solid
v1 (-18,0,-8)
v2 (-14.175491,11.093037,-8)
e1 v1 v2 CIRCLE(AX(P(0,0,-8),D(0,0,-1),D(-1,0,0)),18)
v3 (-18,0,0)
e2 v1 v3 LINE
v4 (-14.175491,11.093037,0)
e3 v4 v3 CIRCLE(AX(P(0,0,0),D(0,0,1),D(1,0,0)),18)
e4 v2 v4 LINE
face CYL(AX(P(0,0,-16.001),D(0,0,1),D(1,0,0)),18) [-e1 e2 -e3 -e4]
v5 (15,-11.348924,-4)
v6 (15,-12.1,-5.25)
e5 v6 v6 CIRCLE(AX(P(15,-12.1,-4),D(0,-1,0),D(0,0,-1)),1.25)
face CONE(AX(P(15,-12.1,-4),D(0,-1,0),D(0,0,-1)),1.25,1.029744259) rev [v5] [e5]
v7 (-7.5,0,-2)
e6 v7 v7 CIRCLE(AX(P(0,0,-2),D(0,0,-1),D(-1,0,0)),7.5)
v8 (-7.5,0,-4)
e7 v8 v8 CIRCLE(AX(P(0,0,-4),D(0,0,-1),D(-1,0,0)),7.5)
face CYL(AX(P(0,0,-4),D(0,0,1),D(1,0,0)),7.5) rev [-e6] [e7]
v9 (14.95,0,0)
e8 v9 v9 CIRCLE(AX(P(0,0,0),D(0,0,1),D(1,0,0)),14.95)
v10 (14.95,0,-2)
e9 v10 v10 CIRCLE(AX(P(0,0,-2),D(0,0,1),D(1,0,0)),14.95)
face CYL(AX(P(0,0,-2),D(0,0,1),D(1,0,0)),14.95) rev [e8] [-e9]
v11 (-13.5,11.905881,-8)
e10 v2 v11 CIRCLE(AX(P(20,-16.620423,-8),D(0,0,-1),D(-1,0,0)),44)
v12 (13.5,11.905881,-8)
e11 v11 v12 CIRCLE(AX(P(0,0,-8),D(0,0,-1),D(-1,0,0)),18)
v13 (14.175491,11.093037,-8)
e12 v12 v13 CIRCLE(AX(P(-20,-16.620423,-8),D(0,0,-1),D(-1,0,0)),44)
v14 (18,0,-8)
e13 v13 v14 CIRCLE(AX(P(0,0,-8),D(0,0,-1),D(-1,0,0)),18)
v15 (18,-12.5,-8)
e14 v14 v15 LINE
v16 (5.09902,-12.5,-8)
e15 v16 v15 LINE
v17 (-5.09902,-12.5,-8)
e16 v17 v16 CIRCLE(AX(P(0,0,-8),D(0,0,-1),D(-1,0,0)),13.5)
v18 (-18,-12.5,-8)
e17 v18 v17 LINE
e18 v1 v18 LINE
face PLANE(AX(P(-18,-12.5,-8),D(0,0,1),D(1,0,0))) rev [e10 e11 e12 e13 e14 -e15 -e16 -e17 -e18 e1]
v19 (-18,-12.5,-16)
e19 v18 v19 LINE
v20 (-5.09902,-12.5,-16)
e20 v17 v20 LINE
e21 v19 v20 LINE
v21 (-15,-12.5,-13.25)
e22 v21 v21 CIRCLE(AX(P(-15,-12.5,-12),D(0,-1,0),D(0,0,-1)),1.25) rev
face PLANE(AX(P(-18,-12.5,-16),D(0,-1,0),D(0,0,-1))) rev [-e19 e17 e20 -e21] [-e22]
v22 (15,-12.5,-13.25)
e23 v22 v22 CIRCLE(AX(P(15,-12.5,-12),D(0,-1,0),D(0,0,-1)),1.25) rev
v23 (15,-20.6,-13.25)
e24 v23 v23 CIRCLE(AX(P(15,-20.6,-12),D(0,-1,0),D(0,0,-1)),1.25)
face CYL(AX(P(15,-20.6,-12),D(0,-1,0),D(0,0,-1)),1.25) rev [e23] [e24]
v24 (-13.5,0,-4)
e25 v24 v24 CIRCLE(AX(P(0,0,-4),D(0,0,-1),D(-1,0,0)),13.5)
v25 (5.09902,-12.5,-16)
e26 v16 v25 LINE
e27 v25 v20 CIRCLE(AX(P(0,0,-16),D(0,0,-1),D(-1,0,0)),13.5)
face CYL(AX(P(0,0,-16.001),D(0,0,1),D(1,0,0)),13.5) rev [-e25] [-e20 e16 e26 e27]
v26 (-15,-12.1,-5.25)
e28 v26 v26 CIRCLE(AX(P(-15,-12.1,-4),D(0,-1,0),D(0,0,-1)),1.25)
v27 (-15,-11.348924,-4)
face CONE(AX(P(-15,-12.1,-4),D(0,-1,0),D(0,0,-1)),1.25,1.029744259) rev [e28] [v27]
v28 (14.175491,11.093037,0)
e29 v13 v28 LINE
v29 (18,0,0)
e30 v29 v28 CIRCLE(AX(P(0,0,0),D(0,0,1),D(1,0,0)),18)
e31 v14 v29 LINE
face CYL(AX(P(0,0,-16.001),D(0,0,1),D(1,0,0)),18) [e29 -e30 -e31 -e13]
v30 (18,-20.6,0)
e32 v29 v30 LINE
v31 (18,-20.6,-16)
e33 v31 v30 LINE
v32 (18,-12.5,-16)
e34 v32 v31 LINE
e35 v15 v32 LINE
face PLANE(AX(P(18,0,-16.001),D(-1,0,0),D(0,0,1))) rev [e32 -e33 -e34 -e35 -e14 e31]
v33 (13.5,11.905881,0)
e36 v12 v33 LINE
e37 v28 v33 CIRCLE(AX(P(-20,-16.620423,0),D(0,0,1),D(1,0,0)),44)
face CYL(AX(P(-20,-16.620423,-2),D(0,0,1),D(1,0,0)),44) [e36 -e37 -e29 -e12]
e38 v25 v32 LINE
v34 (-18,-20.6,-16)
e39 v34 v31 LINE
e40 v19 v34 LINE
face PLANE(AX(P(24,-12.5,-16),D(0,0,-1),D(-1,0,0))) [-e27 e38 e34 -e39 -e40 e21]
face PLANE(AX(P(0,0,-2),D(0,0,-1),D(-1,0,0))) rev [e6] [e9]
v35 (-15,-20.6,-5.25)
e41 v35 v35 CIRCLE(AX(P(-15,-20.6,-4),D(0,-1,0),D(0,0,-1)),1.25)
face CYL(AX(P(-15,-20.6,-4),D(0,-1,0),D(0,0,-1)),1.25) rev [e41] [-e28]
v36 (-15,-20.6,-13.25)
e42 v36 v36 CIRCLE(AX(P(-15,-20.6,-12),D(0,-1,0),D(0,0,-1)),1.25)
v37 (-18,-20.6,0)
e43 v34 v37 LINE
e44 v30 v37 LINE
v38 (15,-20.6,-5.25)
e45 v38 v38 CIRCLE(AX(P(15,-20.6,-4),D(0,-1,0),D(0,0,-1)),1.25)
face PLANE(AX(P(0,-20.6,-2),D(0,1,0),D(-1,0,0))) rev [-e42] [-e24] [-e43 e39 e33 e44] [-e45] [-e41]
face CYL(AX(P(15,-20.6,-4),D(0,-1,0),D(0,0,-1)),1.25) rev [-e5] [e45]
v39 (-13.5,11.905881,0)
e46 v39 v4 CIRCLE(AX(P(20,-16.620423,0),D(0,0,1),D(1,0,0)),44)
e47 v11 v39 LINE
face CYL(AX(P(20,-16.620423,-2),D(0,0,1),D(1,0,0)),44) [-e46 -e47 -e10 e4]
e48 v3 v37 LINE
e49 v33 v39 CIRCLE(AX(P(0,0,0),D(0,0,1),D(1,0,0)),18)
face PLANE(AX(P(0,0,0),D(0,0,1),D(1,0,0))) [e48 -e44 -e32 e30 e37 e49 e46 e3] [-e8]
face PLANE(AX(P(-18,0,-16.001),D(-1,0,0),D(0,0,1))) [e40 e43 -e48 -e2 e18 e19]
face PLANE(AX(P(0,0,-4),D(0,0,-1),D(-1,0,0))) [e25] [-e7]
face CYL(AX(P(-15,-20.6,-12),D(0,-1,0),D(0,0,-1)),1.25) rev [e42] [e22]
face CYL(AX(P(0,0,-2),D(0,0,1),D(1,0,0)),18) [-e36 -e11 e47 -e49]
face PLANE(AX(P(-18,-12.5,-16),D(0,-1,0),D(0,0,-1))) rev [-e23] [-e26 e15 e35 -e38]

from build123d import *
from build123d.topology import SkipClean

# Parameters (mm, degrees)
ESBO_O1_R                     = 18
ESBO_O1_R_2                   = 14.95
RESSALTO_EXTRUS_O1_DEPTH      = 2
ESBO_O16_R                    = 7.5
RESSALTO_EXTRUS_O5_DEPTH      = 2
ESBO_O17_W                    = 48
ESBO_O17_H                    = 12
RESSALTO_EXTRUS_O6_DEPTH      = 8.1
CHANFRO1_SIZE                 = 12
CHANFRO1_SIZE_2               = 12.5
FILETE3_R                     = 44
CORTE_EXTRUS_O11_REACH        = 37.445
CORTE_EXTRUS_O12_REACH        = 31.872
FURO_ROSCADO_DE_M3X0_51_D     = 2.5
FURO_ROSCADO_DE_M3X0_51_DEPTH = 8.5
FURO_ROSCADO_DE_M3X0_51_TIP   = 0.751075774
CORTE_EXTRUS_O13_DEPTH        = 32.691639276
CORTE_EXTRUS_O13_DEPTH_BACK   = 32.691639276
RESSALTO_EXTRUS_O7_DEPTH      = 12
CORTE_EXTRUS_O15_START        = -12
ESBO_O26_R                    = 13.5
CORTE_EXTRUS_O15_DEPTH        = 12
RESSALTO_EXTRUS_O8_START      = -4
RESSALTO_EXTRUS_O8_DEPTH      = 4
RESSALTO_EXTRUS_O9_START      = -4
RESSALTO_EXTRUS_O9_DEPTH      = 4


with BuildPart() as part:
    # Esboço1 → Ressalto-extrusão1 (new body)
    # profile 1 of 2: a face of its own
    with BuildSketch(Plane.XY):
        Circle(ESBO_O1_R)
        Circle(ESBO_O1_R_2, mode=Mode.SUBTRACT)
    # profile 2 of 2: a face of its own
    with BuildSketch(Plane.XY):
        with BuildLine():
            Line((24, -20.6), (24, 0))
            Line((24, 0), (13.5, 11.9058809))
            ThreePointArc((13.5, 11.9058809), (16.83745824, 6.363961031), (18, 0))
            ThreePointArc((18, 0), (-6.363961031, -16.83745824), (-13.5, 11.9058809))
            Line((-13.5, 11.9058809), (-24, 0))
            Line((-24, 0), (-24, -20.6))
            Line((-24, -20.6), (-18, -20.6))
            Line((-18, -20.6), (18, -20.6))
            Line((18, -20.6), (24, -20.6))
        make_face()
    extrude(amount=-RESSALTO_EXTRUS_O1_DEPTH)

    # Esboço16 → Ressalto-extrusão5 (add)
    with BuildSketch(Plane(origin=(0, 0, -2), x_dir=(-1, 0, 0), z_dir=(0, 0, -1))):
        with BuildLine():
            Line((-13.5, 11.9058809), (-24, 0))
            Line((-24, 0), (-24, -20.6))
            Line((-24, -20.6), (24, -20.6))
            Line((24, -20.6), (24, 0))
            Line((24, 0), (13.5, 11.9058809))
            ThreePointArc((13.5, 11.9058809), (0, 18), (-13.5, 11.9058809))
        make_face()
        Circle(ESBO_O16_R, mode=Mode.SUBTRACT)
    extrude(amount=RESSALTO_EXTRUS_O5_DEPTH)

    # Esboço17 → Ressalto-extrusão6 (add)
    with BuildSketch(Plane.XZ.offset(20.6)):
        with Locations((0, -10)):
            Rectangle(ESBO_O17_W, ESBO_O17_H)
    extrude(amount=-RESSALTO_EXTRUS_O6_DEPTH)

    # Chanfro1
    # the kernel refuses this chamfer: 12.5, 12 mm, written as the material it adds along each edge
    with BuildSketch(Plane(origin=(-24, -12.5, -4), x_dir=(0, 0, -1), z_dir=(1, 0, 0))) as chanfro1_piece_1_section:
        Polygon((CHANFRO1_SIZE, 0), (0, CHANFRO1_SIZE_2), (0, 0), align=None)
    chanfro1_piece_1 = extrude(amount=48, mode=Mode.PRIVATE)
    chanfro1_piece_1 = split(chanfro1_piece_1, bisect_by=Plane(origin=(-24, -12.5, -16), z_dir=(0, 0, 1)), keep=Keep.TOP, mode=Mode.PRIVATE)
    chanfro1_piece_1 = split(chanfro1_piece_1, bisect_by=Plane(origin=(9.200979635, 16.7805118, -4), z_dir=(-0.7499999999999999, -0.6614378277661479, 0)), keep=Keep.TOP, mode=Mode.PRIVATE)
    chanfro1_piece_1 = chanfro1_piece_1 - Plane(origin=(0, 0, -4), x_dir=(-1, 0, 0), z_dir=(0, 0, 1)) * Cylinder(7.5, 146, mode=Mode.PRIVATE)
    add(chanfro1_piece_1)

    # Filete3
    # the kernel refuses this fillet: 44 mm, written as the material it takes off along each edge
    with BuildSketch(Plane(origin=(-24, 0, -45.551056879), x_dir=(0, -1, 0), z_dir=(0, 0, 1))) as filete3_piece_1:
        with BuildLine():
            CenterArc((16.620422751, 44), FILETE3_R, 229.584560979, 40.415439021)
            Line((-11.9058809, 10.5), (0, 0))
            Line((0, 0), (16.620422751, 0))
        make_face()
    extrude(amount=87.102113757, mode=Mode.SUBTRACT)
    with BuildSketch(Plane(origin=(24, 0, 41.551056879), x_dir=(-0.6614378277661485, 0.7499999999999993, -1.154178375495321e-15), z_dir=(0, 0, -1))) as filete3_piece_2:
        with BuildLine():
            CenterArc((16.637947358, -43.993376321), FILETE3_R, 90.994183088, 40.415439021)
            Line((-12.465317064, -10.993376321), (0, 0))
            Line((0, 0), (15.874507866, 0))
        make_face()
    extrude(amount=87.102113757, mode=Mode.SUBTRACT)

    # Esboço18 → Corte-extrusão11 (cut, up to next)
    with BuildSketch(Plane.XY, mode=Mode.PRIVATE) as corte_extrus_o11_sk1:
        with BuildLine():
            Line((18, 0), (18, -20.6))
            Line((18, -20.6), (24, -20.6))
            Line((24, -20.6), (24, -16.620422751))
            ThreePointArc((24, -16.620422751), (21.471204393, -1.918749165), (14.175490626, 11.093036803))
            ThreePointArc((14.175490626, 11.093036803), (17.017033103, 5.86690586), (18, 0))
        make_face()
    corte_extrus_o11_tool1 = extrude(corte_extrus_o11_sk1.sketch, amount=-CORTE_EXTRUS_O11_REACH, mode=Mode.PRIVATE) & part.part
    # Esboço18 → Corte-extrusão11 (cut, up to next)
    with BuildSketch(Plane.XY, mode=Mode.PRIVATE) as corte_extrus_o11_sk2:
        with BuildLine():
            Line((-18, -20.6), (-18, 0))
            ThreePointArc((-18, 0), (-17.017033103, 5.86690586), (-14.175490626, 11.093036803))
            ThreePointArc((-14.175490626, 11.093036803), (-21.471204393, -1.918749165), (-24, -16.620422751))
            Line((-24, -16.620422751), (-24, -20.6))
            Line((-24, -20.6), (-18, -20.6))
        make_face()
    corte_extrus_o11_tool2 = extrude(corte_extrus_o11_sk2.sketch, amount=-CORTE_EXTRUS_O11_REACH, mode=Mode.PRIVATE) & part.part
    add(corte_extrus_o11_tool1.solids().sort_by_distance((20.438878, -9.921074, 0))[0], mode=Mode.SUBTRACT)
    add(corte_extrus_o11_tool2.solids().sort_by_distance((-20.438878, -9.921074, 0))[0], mode=Mode.SUBTRACT)

    # Esboço19 → Corte-extrusão12 (cut, up to next)
    with BuildSketch(Plane(origin=(0, 0, -4), x_dir=(-1, 0, 0), z_dir=(0, 0, -1)), mode=Mode.PRIVATE) as corte_extrus_o12_sk1:
        with BuildLine():
            Line((12, -20.6), (13.462552863, -1.004823575))
            ThreePointArc((13.462552863, -1.004823575), (0, 13.5), (-13.462552863, -1.004823575))
            Line((-13.462552863, -1.004823575), (-12, -20.6))
            Line((-12, -20.6), (12, -20.6))
        make_face()
    corte_extrus_o12_tool1 = extrude(corte_extrus_o12_sk1.sketch, amount=CORTE_EXTRUS_O12_REACH, mode=Mode.PRIVATE) & part.part
    add(corte_extrus_o12_tool1.solids().sort_by_distance((0, -4.517343, -4))[0], mode=Mode.SUBTRACT)

    # Furo roscado de M3x0.51
    with Locations(Plane.XZ.offset(20.6)):
        with Locations((-15, -12), (-15, -4), (15, -4), (15, -12)):
            Hole(FURO_ROSCADO_DE_M3X0_51_D / 2, depth=FURO_ROSCADO_DE_M3X0_51_DEPTH)
            with Locations((0, 0, -(FURO_ROSCADO_DE_M3X0_51_DEPTH + FURO_ROSCADO_DE_M3X0_51_TIP / 2))):  # 118° drill point
                Cone(0, FURO_ROSCADO_DE_M3X0_51_D / 2, FURO_ROSCADO_DE_M3X0_51_TIP, mode=Mode.SUBTRACT)

    # Esboço23 → Corte-extrusão13 (cut, two sides: drawn at the far end of the back side and taken through both)
    with BuildSketch(Plane(origin=(0, 0, 0), x_dir=(0, 0, -1), z_dir=(1, 0, 0)).offset(-CORTE_EXTRUS_O13_DEPTH_BACK)):
        Polygon((16, -12.5), (8, -12.5), (8, -4.166666667), align=None)
    extrude(amount=CORTE_EXTRUS_O13_DEPTH + CORTE_EXTRUS_O13_DEPTH_BACK, mode=Mode.SUBTRACT)

    # Esboço24 → Ressalto-extrusão7 (add)
    with BuildSketch(Plane(origin=(0, 0, -4), x_dir=(-1, 0, 0), z_dir=(0, 0, -1))):
        Polygon((-12, -20.6), (12, -20.6), (12.604571142, -12.5), (-12.604571142, -12.5), align=None)
    extrude(amount=RESSALTO_EXTRUS_O7_DEPTH)

    # Esboço26 → Corte-extrusão15 (cut)
    with BuildSketch(Plane(origin=(0, 0, -16), x_dir=(-1, 0, 0), z_dir=(0, 0, -1)).offset(CORTE_EXTRUS_O15_START)):
        Circle(ESBO_O26_R)
    extrude(amount=CORTE_EXTRUS_O15_DEPTH, mode=Mode.SUBTRACT)

    # Esboço27 → Ressalto-extrusão8 (add)
    with SkipClean():  # the faces are left unmerged after this step: merging them gives an invalid solid
        with BuildSketch(Plane(origin=(0, 0, -8), x_dir=(-1, 0, 0), z_dir=(0, 0, -1)).offset(RESSALTO_EXTRUS_O8_START)):
            with BuildLine():
                Line((-12.604571142, -12.5), (-5.099019514, -12.5))
                ThreePointArc((-5.099019514, -12.5), (-10.916398789, -7.942432717), (-13.462552863, -1.004823575))
                Line((-13.462552863, -1.004823575), (-13.226557914, -4.166666667))
                Line((-13.226557914, -4.166666667), (-12.604571142, -12.5))
            make_face()
            with BuildLine():
                Line((5.099019514, -12.5), (12.604571142, -12.5))
                Line((12.604571142, -12.5), (13.462552863, -1.004823575))
                ThreePointArc((13.462552863, -1.004823575), (10.916398789, -7.942432717), (5.099019514, -12.5))
            make_face()
        extrude(amount=RESSALTO_EXTRUS_O8_DEPTH)

    # Esboço28 → Ressalto-extrusão9 (add)
    with SkipClean():  # the faces are left unmerged after this step: merging them gives an invalid solid
        with BuildSketch(Plane(origin=(0, 0, -8), x_dir=(-1, 0, 0), z_dir=(0, 0, -1)).offset(RESSALTO_EXTRUS_O9_START)):
            with BuildLine():
                Line((13.462552863, -1.004823575), (13.226557914, -4.166666667))
                Line((13.226557914, -4.166666667), (18, -4.166666667))
                Line((18, -4.166666667), (18, 0))
                ThreePointArc((18, 0), (17.017033103, 5.86690586), (14.175490626, 11.093036803))
                ThreePointArc((14.175490626, 11.093036803), (13.840185974, 11.501487092), (13.5, 11.9058809))
                ThreePointArc((13.5, 11.9058809), (0, 18), (-13.5, 11.9058809))
                ThreePointArc((-13.5, 11.9058809), (-13.840185974, 11.501487092), (-14.175490626, 11.093036803))
                ThreePointArc((-14.175490626, 11.093036803), (-17.017033103, 5.86690586), (-18, 0))
                Line((-18, 0), (-18, -4.166666667))
                Line((-18, -4.166666667), (-13.226557914, -4.166666667))
                Line((-13.226557914, -4.166666667), (-13.462552863, -1.004823575))
                ThreePointArc((-13.462552863, -1.004823575), (-0.502760556, 13.490634967), (13.5, 0))
                ThreePointArc((13.5, 0), (13.490634967, -0.502760556), (13.462552863, -1.004823575))
            make_face()
        extrude(amount=RESSALTO_EXTRUS_O9_DEPTH)


solid = part.part
